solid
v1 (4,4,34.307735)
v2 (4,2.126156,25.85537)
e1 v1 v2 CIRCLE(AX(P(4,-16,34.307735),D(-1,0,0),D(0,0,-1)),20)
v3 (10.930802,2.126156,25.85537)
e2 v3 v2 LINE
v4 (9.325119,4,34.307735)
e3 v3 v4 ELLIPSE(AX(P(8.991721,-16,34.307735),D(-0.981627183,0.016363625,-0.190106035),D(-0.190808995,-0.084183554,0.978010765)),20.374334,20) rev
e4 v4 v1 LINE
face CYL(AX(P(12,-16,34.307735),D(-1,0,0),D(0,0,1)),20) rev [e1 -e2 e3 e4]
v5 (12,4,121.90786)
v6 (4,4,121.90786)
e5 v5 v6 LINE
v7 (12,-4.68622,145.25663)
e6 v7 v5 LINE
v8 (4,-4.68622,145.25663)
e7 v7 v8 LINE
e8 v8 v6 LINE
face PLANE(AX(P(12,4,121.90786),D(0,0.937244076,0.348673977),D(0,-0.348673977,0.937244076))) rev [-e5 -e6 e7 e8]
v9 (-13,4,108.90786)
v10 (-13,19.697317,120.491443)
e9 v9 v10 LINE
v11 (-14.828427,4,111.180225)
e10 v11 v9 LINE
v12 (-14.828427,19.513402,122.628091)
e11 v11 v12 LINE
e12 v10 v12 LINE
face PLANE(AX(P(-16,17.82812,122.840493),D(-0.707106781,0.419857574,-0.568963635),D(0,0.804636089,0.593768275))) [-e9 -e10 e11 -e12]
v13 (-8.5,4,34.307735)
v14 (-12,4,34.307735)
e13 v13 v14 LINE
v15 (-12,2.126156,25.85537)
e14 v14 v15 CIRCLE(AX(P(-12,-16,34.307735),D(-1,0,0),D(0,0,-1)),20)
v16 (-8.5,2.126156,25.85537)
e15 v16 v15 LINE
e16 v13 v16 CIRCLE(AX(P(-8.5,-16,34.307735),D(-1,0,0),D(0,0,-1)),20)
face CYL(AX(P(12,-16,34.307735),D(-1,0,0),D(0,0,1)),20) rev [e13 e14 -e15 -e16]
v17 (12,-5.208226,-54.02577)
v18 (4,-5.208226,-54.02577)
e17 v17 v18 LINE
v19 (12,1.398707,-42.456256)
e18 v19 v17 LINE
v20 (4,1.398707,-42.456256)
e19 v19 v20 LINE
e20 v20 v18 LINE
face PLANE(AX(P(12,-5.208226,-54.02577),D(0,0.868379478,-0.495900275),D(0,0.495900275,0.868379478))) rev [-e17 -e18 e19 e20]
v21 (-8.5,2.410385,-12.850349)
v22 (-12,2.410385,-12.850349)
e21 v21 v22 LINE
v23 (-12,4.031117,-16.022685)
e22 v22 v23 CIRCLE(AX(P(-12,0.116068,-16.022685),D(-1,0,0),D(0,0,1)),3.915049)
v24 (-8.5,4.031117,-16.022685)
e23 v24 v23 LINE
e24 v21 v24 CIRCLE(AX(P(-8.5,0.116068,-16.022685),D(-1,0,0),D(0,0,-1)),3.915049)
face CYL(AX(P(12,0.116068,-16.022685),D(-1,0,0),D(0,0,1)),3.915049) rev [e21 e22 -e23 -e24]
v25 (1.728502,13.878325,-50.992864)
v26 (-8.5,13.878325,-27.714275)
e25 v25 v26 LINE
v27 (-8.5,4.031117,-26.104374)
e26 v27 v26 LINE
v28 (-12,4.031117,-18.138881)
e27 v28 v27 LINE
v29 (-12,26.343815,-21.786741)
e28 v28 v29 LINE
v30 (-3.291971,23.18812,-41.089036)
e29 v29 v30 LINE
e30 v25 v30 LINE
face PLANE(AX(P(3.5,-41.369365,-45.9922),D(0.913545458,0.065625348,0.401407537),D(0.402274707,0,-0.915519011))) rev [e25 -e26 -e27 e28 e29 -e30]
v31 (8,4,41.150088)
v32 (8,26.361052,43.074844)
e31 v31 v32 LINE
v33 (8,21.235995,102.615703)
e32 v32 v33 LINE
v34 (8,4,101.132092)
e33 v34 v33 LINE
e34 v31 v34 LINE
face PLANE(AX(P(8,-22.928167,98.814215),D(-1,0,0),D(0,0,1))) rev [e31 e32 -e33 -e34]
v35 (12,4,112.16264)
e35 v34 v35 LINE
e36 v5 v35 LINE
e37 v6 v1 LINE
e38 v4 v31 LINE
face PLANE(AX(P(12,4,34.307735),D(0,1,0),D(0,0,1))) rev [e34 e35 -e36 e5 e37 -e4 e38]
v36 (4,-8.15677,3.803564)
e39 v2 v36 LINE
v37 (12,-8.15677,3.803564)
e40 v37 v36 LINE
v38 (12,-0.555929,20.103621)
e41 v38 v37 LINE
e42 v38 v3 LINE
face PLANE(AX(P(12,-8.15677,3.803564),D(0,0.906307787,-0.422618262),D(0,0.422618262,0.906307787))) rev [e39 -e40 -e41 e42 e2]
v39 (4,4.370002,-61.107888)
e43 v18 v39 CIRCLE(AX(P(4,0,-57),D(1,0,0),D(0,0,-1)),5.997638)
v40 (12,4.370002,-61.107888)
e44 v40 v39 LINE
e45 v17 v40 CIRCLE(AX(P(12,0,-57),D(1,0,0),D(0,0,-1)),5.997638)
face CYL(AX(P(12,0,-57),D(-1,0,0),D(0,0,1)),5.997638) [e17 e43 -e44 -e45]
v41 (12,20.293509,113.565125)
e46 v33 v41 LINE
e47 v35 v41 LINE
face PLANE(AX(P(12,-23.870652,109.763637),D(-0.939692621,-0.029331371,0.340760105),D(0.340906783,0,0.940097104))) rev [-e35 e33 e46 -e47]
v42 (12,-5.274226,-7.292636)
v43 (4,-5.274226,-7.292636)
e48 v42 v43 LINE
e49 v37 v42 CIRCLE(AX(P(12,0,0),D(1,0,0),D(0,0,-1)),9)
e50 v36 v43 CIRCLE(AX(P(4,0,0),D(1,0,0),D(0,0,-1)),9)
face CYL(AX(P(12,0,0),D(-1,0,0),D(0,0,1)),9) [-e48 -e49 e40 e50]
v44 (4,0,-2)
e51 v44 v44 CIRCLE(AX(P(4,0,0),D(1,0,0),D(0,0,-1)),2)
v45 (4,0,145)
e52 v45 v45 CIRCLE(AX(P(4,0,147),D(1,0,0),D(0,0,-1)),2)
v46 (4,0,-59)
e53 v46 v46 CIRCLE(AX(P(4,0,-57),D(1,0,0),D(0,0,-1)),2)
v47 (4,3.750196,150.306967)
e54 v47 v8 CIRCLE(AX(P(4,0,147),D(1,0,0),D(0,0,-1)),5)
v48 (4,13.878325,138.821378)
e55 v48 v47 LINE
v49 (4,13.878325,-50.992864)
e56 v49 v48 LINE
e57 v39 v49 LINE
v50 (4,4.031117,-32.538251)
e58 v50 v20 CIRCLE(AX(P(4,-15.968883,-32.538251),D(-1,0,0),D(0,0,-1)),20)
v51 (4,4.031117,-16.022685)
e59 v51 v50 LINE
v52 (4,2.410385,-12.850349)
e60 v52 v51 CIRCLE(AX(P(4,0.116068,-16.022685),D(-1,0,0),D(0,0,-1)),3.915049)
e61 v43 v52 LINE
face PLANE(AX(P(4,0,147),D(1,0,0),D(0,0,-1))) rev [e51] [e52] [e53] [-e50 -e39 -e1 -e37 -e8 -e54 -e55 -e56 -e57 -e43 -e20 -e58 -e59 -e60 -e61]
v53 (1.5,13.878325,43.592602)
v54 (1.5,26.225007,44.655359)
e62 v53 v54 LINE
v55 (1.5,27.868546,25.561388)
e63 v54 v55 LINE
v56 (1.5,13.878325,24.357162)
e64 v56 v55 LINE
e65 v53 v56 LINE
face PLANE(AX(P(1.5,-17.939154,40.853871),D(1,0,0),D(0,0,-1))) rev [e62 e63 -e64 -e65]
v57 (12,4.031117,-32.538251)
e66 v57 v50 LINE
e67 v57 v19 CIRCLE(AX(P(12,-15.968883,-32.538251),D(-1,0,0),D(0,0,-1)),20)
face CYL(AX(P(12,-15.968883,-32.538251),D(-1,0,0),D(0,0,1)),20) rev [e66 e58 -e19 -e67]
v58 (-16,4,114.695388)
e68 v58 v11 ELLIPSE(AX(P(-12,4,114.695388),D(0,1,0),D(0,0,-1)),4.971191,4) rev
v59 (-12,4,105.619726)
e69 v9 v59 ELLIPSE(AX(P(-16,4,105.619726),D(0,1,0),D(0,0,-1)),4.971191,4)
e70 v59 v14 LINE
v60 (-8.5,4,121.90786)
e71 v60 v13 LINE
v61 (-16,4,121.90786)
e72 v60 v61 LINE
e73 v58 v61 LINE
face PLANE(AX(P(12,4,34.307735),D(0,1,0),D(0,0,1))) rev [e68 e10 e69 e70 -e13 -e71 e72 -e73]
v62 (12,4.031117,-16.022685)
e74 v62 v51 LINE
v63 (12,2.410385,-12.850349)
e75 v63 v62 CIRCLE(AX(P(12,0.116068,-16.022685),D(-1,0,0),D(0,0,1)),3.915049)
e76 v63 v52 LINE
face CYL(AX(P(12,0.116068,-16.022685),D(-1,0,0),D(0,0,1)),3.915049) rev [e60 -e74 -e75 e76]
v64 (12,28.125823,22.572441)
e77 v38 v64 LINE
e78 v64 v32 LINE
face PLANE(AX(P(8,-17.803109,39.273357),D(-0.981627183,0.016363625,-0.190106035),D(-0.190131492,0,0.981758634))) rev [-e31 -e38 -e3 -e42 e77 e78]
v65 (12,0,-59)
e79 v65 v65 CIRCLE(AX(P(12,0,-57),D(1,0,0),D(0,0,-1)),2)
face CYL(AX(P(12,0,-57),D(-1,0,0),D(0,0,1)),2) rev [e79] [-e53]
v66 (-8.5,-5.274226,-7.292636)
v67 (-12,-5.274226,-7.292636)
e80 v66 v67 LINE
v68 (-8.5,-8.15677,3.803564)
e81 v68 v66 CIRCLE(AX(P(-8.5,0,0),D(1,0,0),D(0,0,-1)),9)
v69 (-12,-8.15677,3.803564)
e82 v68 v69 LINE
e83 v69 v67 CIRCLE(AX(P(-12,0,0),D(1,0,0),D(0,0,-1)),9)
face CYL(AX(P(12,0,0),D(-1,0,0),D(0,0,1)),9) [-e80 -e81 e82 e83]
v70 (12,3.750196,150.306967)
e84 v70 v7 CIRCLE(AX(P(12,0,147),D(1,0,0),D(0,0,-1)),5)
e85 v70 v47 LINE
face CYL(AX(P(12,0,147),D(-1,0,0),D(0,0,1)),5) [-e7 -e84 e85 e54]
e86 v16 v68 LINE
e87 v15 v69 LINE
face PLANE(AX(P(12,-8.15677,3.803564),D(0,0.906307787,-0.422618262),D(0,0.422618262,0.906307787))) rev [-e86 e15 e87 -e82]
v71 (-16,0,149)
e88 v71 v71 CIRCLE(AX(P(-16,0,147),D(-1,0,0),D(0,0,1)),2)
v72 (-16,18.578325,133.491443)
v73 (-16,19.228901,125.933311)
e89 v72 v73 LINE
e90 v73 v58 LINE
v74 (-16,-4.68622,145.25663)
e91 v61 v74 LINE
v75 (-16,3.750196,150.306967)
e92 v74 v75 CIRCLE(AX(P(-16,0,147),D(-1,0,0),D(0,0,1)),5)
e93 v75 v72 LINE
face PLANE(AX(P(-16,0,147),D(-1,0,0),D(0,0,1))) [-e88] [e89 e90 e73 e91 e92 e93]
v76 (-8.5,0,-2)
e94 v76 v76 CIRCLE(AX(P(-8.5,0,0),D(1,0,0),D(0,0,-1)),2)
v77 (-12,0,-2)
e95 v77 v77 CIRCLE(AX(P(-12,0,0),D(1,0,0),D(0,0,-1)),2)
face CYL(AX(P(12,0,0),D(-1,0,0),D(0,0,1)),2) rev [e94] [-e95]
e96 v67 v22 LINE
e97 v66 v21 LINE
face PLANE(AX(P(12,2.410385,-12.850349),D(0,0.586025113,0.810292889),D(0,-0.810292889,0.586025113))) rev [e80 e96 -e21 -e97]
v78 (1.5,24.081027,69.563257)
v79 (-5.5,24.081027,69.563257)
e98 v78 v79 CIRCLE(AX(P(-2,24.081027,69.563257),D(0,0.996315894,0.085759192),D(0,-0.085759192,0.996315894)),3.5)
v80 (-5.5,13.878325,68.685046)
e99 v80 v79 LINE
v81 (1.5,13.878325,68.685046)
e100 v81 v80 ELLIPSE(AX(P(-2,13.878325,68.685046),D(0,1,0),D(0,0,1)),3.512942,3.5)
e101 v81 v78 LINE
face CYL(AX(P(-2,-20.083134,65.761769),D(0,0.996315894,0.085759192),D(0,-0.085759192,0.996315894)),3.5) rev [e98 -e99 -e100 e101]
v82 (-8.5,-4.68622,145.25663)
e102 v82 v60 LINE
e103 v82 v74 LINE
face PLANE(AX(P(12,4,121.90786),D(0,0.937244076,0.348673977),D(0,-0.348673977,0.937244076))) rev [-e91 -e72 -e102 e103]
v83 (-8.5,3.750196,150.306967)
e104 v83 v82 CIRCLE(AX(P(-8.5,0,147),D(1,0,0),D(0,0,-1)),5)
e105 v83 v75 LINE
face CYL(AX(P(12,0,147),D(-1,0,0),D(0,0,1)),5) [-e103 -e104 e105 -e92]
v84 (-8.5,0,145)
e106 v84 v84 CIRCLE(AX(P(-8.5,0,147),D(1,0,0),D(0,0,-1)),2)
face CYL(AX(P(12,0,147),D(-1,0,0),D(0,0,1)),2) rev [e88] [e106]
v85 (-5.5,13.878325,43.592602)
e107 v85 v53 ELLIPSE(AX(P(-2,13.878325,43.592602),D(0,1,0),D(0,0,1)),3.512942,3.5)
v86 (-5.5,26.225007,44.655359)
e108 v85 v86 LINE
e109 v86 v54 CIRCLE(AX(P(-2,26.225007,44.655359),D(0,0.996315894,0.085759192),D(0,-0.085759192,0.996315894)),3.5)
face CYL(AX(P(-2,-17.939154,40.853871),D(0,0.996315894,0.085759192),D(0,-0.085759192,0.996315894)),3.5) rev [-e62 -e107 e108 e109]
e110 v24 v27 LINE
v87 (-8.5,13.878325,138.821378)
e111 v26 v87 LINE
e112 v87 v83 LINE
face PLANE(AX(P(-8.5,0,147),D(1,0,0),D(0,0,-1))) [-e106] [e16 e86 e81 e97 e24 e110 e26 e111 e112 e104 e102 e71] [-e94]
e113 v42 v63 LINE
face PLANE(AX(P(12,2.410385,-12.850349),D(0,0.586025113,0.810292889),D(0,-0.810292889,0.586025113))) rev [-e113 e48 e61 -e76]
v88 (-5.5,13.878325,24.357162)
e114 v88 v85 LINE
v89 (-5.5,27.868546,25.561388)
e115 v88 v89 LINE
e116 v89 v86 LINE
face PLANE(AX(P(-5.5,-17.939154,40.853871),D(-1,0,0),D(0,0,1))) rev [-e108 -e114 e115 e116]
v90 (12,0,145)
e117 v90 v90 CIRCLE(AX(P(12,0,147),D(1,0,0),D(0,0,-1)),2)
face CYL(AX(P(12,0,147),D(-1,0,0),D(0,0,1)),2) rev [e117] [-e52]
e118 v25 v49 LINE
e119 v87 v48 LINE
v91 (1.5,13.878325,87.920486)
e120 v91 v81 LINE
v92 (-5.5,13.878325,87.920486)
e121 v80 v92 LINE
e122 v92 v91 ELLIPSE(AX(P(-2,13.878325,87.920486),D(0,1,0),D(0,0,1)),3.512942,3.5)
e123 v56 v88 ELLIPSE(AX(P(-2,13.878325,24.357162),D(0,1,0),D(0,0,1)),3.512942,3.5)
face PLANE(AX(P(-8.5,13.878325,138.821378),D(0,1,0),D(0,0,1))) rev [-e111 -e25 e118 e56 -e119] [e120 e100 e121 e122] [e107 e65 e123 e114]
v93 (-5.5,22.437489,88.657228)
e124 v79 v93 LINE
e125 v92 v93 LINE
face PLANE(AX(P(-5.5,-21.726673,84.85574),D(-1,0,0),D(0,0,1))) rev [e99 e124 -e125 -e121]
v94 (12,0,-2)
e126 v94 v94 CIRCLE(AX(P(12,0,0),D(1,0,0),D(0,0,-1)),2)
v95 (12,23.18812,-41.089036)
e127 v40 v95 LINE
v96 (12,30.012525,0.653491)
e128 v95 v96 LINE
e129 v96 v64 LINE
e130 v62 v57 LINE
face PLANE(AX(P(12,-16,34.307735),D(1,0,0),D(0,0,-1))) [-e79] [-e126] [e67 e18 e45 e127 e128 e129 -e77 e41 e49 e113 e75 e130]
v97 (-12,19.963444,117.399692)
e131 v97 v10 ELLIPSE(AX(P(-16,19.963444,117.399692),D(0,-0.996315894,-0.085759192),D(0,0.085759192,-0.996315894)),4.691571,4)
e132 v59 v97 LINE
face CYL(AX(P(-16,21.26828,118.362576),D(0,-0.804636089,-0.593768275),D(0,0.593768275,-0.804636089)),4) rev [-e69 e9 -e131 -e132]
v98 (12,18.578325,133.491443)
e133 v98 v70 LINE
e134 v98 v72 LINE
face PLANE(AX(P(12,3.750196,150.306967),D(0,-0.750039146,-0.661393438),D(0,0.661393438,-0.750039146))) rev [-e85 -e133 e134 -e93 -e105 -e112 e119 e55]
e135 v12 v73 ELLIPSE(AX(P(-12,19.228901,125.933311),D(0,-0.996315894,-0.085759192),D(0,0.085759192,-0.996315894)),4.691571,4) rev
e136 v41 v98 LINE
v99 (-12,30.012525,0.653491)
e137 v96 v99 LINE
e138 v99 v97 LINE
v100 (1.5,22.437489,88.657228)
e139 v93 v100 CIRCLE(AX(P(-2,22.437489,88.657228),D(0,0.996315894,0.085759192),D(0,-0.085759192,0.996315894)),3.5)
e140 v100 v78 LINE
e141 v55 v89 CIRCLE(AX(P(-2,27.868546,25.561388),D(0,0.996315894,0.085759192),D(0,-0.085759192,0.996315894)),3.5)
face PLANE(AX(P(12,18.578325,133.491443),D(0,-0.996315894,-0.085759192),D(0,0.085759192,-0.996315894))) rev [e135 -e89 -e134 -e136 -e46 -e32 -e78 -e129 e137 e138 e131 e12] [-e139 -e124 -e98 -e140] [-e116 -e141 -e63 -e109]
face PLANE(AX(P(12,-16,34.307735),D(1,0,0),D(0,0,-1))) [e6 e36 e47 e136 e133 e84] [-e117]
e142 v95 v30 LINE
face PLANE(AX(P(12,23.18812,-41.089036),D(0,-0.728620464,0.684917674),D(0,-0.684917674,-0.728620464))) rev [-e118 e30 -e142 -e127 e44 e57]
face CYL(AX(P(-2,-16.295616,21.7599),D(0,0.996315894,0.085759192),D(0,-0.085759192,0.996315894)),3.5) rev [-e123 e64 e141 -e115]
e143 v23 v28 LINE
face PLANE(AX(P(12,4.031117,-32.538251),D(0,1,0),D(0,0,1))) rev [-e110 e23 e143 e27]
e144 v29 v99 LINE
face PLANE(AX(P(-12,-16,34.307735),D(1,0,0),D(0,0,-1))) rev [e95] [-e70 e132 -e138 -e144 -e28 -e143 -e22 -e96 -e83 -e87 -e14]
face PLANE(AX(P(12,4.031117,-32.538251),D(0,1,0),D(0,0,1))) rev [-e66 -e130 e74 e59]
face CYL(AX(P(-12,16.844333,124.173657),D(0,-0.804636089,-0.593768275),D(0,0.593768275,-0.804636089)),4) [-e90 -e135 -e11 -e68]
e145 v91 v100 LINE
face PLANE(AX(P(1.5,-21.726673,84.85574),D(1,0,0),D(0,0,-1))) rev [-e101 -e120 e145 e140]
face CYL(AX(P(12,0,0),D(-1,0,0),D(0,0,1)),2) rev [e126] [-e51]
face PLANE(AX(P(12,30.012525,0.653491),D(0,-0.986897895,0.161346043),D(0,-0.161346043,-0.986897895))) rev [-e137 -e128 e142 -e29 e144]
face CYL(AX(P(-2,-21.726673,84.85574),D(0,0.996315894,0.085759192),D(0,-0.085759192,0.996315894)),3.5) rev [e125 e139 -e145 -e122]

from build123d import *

# Parameters (mm, degrees)
SKETCH1_R           = 2
BOSS_EXTRUDE1_DEPTH = 12
CUT_EXTRUDE1_DEPTH  = 162.777588211
SKETCH5_R           = 2
BOSS_EXTRUDE3_DEPTH = 4
CUT_EXTRUDE2_DEPTH  = 12.5
CHAMFER1_SIZE       = 3
FILLET1_R           = 4
CUT_EXTRUDE3_DEPTH  = 156.224708777
CUT_EXTRUDE4_DEPTH  = 156.224708777


with BuildPart() as part:
    # Sketch1 → Boss-Extrude1 (new, symmetric)
    with BuildSketch(Plane(origin=(0, 0, 0), x_dir=(0, 0, -1), z_dir=(1, 0, 0))):
        with BuildLine():
            Line((-121.907859823, 4), (-145.256630116, -4.68622038))
            ThreePointArc((-145.256630116, -4.68622038), (-151.290045259, -2.568172828), (-150.306967189, 3.75019573))
            Line((-150.306967189, 3.75019573), (-133.491442782, 18.578325107))
            Line((-133.491442782, 18.578325107), (-0.653491001, 30.01252535))
            Line((-0.653491001, 30.01252535), (41.089036304, 23.188119662))
            Line((41.089036304, 23.188119662), (61.107888441, 4.370001963))
            ThreePointArc((61.107888441, 4.370001963), (61.822541623, -3.565775777), (54.025769542, -5.208225973))
            Line((54.025769542, -5.208225973), (42.456256278, 1.398706774))
            ThreePointArc((42.456256278, 1.398706774), (37.66895292, 3.361815488), (32.53825078, 4.031117219))
            Line((32.53825078, 4.031117219), (16.022685374, 4.031117219))
            ThreePointArc((16.022685374, 4.031117219), (14.241499513, 3.602468352), (12.850348738, 2.410385115))
            Line((12.850348738, 2.410385115), (7.292636005, -5.274226019))
            ThreePointArc((7.292636005, -5.274226019), (2.262889815, -8.71087422), (-3.803564356, -8.156770083))
            Line((-3.803564356, -8.156770083), (-25.855369948, 2.126155741))
            ThreePointArc((-25.855369948, 2.126155741), (-29.978942905, 3.525920142), (-34.307735183, 4))
            Line((-34.307735183, 4), (-121.907859823, 4))
        make_face()
        Circle(SKETCH1_R, mode=Mode.SUBTRACT)
        with Locations((57, 0)):
            Circle(SKETCH1_R, mode=Mode.SUBTRACT)
        with Locations((-147, 0)):
            Circle(SKETCH1_R, mode=Mode.SUBTRACT)
    extrude(amount=BOSS_EXTRUDE1_DEPTH, both=True)

    # Sketch2 → Cut-Extrude1 (cut, through all)
    with BuildSketch(Plane(origin=(0, 29.127166191, -4.761944507), x_dir=(1, 0, 0), z_dir=(0, 0.9868978946219392, -0.16134604299698216))):
        Polygon((3.5, 62.250818245), (3.5, 52.064388241), (-12, 17.250818245), (-12, 62.250818245), align=None)
    extrude(amount=-CUT_EXTRUDE1_DEPTH, mode=Mode.SUBTRACT)

    # Sketch5 → Boss-Extrude3 (add)
    with BuildSketch(Plane.ZY.offset(12)):
        with BuildLine():
            Line((145.256630116, -4.68622038), (121.907859823, 4))
            Line((121.907859823, 4), (108.907859823, 4))
            Line((108.907859823, 4), (120.491442782, 19.697317091))
            Line((120.491442782, 19.697317091), (133.491442782, 18.578325107))
            Line((133.491442782, 18.578325107), (150.306967189, 3.75019573))
            ThreePointArc((150.306967189, 3.75019573), (151.290045259, -2.568172828), (145.256630116, -4.68622038))
        make_face()
        with Locations((147, 0)):
            Circle(SKETCH5_R, mode=Mode.SUBTRACT)
    extrude(amount=BOSS_EXTRUDE3_DEPTH)

    # Sketch6 → Cut-Extrude2 (cut)
    with BuildSketch(Plane(origin=(4, 0, 0), x_dir=(0, 0, -1), z_dir=(1, 0, 0))):
        with BuildLine():
            Line((-150.306967189, 3.75019573), (-138.821377712, 13.878325107))
            Line((-138.821377712, 13.878325107), (50.992864285, 13.878325107))
            Line((50.992864285, 13.878325107), (61.107888441, 4.370001963))
            ThreePointArc((61.107888441, 4.370001963), (61.822541623, -3.565775777), (54.025769542, -5.208225973))
            Line((54.025769542, -5.208225973), (42.456256278, 1.398706774))
            ThreePointArc((42.456256278, 1.398706774), (37.66895292, 3.361815488), (32.53825078, 4.031117219))
            Line((32.53825078, 4.031117219), (16.022685374, 4.031117219))
            ThreePointArc((16.022685374, 4.031117219), (14.241499513, 3.602468352), (12.850348738, 2.410385115))
            Line((12.850348738, 2.410385115), (7.292636005, -5.274226019))
            ThreePointArc((7.292636005, -5.274226019), (2.262889815, -8.71087422), (-3.803564356, -8.156770083))
            Line((-3.803564356, -8.156770083), (-25.855369948, 2.126155741))
            ThreePointArc((-25.855369948, 2.126155741), (-29.978942905, 3.525920142), (-34.307735183, 4))
            Line((-34.307735183, 4), (-121.907859823, 4))
            Line((-121.907859823, 4), (-145.256630116, -4.68622038))
            ThreePointArc((-145.256630116, -4.68622038), (-151.290045259, -2.568172828), (-150.306967189, 3.75019573))
        make_face()
    extrude(amount=-CUT_EXTRUDE2_DEPTH, mode=Mode.SUBTRACT)

    # Chamfer1
    chamfer1_edges = [part.edges().sort_by_distance(p)[0] for p in [
        (-16, 11.848658545, 114.699651303),
    ]]
    chamfer(chamfer1_edges, length=CHAMFER1_SIZE)

    # Fillet1
    # the kernel refuses this fillet: 4 mm, written as the material it adds along each edge
    with BuildSketch(Plane(origin=(-12, -1.322167469, 104.980451844), x_dir=(-1, 0, 0), z_dir=(0, 0.8046360890172893, 0.593768274877465))) as fillet1_piece_1_section:
        with BuildLine():
            CenterArc((4, -2.645751311), FILLET1_R, 138.590377891, 41.409622109)
            Line((0, -2.645751311), (0, 0))
            Line((0, 0), (1, 0))
        make_face()
    fillet1_piece_1 = extrude(amount=32.737348458, mode=Mode.PRIVATE)
    fillet1_piece_1 = split(fillet1_piece_1, bisect_by=Plane(origin=(-12, 20.868035787, 106.890502579), z_dir=(0, -0.9963158941582452, -0.08575919220501364)), keep=Keep.TOP, mode=Mode.PRIVATE)
    fillet1_piece_1 = split(fillet1_piece_1, bisect_by=Plane(origin=(-12, 4, 104.980451844), z_dir=(0, 1, 0)), keep=Keep.TOP, mode=Mode.PRIVATE)
    add(fillet1_piece_1)
    # the kernel refuses this fillet: 4 mm, written as the material it takes off along each edge
    with BuildSketch(Plane(origin=(-16, 0.667088192, 110.176784644), x_dir=(0, -0.593768274877465, 0.8046360890172894), z_dir=(0, 0.8046360890172893, 0.593768274877465))) as fillet1_2_piece_1:
        with BuildLine():
            CenterArc((FILLET1_R * 0.414213562373, FILLET1_R), FILLET1_R, 225, 45)
            Line((-FILLET1_R * 0.292893218813, FILLET1_R * 0.292893218813), (0, 0))
            Line((0, 0), (FILLET1_R * 0.414213562373, 0))
        make_face()
    extrude(amount=27.417837682, mode=Mode.SUBTRACT)

    # Sketch7 → Cut-Extrude3 (cut, through all)
    with BuildSketch(Plane(origin=(0, 29.847630452, 2.569173785), x_dir=(1, 0, 0), z_dir=(0, 0.9963158941582453, 0.08575919220501363))):
        Polygon((12, -111.406384024), (8, -100.416474347), (8, -40.655449605), (12, -20.077233541), align=None)
    extrude(amount=-CUT_EXTRUDE3_DEPTH, mode=Mode.SUBTRACT)

    # Sketch8 → Cut-Extrude4 (cut, through all)
    with BuildSketch(Plane(origin=(0, 29.847630452, 2.569173785), x_dir=(1, 0, 0), z_dir=(0, 0.9963158941582453, 0.08575919220501363))):
        with BuildLine():
            Line((-5.5, -42.241808783), (-5.5, -23.077233541))
            ThreePointArc((-5.5, -23.077233541), (-2, -19.577233541), (1.5, -23.077233541))
            Line((1.5, -23.077233541), (1.5, -42.241808783))
            ThreePointArc((1.5, -42.241808783), (-2, -45.741808783), (-5.5, -42.241808783))
        make_face()
        with BuildLine():
            Line((-5.5, -86.406384024), (-5.5, -67.241808783))
            ThreePointArc((-5.5, -67.241808783), (-2, -63.741808783), (1.5, -67.241808783))
            Line((1.5, -67.241808783), (1.5, -86.406384024))
            ThreePointArc((1.5, -86.406384024), (-2, -89.906384024), (-5.5, -86.406384024))
        make_face()
    extrude(amount=-CUT_EXTRUDE4_DEPTH, mode=Mode.SUBTRACT)


solid = part.part
